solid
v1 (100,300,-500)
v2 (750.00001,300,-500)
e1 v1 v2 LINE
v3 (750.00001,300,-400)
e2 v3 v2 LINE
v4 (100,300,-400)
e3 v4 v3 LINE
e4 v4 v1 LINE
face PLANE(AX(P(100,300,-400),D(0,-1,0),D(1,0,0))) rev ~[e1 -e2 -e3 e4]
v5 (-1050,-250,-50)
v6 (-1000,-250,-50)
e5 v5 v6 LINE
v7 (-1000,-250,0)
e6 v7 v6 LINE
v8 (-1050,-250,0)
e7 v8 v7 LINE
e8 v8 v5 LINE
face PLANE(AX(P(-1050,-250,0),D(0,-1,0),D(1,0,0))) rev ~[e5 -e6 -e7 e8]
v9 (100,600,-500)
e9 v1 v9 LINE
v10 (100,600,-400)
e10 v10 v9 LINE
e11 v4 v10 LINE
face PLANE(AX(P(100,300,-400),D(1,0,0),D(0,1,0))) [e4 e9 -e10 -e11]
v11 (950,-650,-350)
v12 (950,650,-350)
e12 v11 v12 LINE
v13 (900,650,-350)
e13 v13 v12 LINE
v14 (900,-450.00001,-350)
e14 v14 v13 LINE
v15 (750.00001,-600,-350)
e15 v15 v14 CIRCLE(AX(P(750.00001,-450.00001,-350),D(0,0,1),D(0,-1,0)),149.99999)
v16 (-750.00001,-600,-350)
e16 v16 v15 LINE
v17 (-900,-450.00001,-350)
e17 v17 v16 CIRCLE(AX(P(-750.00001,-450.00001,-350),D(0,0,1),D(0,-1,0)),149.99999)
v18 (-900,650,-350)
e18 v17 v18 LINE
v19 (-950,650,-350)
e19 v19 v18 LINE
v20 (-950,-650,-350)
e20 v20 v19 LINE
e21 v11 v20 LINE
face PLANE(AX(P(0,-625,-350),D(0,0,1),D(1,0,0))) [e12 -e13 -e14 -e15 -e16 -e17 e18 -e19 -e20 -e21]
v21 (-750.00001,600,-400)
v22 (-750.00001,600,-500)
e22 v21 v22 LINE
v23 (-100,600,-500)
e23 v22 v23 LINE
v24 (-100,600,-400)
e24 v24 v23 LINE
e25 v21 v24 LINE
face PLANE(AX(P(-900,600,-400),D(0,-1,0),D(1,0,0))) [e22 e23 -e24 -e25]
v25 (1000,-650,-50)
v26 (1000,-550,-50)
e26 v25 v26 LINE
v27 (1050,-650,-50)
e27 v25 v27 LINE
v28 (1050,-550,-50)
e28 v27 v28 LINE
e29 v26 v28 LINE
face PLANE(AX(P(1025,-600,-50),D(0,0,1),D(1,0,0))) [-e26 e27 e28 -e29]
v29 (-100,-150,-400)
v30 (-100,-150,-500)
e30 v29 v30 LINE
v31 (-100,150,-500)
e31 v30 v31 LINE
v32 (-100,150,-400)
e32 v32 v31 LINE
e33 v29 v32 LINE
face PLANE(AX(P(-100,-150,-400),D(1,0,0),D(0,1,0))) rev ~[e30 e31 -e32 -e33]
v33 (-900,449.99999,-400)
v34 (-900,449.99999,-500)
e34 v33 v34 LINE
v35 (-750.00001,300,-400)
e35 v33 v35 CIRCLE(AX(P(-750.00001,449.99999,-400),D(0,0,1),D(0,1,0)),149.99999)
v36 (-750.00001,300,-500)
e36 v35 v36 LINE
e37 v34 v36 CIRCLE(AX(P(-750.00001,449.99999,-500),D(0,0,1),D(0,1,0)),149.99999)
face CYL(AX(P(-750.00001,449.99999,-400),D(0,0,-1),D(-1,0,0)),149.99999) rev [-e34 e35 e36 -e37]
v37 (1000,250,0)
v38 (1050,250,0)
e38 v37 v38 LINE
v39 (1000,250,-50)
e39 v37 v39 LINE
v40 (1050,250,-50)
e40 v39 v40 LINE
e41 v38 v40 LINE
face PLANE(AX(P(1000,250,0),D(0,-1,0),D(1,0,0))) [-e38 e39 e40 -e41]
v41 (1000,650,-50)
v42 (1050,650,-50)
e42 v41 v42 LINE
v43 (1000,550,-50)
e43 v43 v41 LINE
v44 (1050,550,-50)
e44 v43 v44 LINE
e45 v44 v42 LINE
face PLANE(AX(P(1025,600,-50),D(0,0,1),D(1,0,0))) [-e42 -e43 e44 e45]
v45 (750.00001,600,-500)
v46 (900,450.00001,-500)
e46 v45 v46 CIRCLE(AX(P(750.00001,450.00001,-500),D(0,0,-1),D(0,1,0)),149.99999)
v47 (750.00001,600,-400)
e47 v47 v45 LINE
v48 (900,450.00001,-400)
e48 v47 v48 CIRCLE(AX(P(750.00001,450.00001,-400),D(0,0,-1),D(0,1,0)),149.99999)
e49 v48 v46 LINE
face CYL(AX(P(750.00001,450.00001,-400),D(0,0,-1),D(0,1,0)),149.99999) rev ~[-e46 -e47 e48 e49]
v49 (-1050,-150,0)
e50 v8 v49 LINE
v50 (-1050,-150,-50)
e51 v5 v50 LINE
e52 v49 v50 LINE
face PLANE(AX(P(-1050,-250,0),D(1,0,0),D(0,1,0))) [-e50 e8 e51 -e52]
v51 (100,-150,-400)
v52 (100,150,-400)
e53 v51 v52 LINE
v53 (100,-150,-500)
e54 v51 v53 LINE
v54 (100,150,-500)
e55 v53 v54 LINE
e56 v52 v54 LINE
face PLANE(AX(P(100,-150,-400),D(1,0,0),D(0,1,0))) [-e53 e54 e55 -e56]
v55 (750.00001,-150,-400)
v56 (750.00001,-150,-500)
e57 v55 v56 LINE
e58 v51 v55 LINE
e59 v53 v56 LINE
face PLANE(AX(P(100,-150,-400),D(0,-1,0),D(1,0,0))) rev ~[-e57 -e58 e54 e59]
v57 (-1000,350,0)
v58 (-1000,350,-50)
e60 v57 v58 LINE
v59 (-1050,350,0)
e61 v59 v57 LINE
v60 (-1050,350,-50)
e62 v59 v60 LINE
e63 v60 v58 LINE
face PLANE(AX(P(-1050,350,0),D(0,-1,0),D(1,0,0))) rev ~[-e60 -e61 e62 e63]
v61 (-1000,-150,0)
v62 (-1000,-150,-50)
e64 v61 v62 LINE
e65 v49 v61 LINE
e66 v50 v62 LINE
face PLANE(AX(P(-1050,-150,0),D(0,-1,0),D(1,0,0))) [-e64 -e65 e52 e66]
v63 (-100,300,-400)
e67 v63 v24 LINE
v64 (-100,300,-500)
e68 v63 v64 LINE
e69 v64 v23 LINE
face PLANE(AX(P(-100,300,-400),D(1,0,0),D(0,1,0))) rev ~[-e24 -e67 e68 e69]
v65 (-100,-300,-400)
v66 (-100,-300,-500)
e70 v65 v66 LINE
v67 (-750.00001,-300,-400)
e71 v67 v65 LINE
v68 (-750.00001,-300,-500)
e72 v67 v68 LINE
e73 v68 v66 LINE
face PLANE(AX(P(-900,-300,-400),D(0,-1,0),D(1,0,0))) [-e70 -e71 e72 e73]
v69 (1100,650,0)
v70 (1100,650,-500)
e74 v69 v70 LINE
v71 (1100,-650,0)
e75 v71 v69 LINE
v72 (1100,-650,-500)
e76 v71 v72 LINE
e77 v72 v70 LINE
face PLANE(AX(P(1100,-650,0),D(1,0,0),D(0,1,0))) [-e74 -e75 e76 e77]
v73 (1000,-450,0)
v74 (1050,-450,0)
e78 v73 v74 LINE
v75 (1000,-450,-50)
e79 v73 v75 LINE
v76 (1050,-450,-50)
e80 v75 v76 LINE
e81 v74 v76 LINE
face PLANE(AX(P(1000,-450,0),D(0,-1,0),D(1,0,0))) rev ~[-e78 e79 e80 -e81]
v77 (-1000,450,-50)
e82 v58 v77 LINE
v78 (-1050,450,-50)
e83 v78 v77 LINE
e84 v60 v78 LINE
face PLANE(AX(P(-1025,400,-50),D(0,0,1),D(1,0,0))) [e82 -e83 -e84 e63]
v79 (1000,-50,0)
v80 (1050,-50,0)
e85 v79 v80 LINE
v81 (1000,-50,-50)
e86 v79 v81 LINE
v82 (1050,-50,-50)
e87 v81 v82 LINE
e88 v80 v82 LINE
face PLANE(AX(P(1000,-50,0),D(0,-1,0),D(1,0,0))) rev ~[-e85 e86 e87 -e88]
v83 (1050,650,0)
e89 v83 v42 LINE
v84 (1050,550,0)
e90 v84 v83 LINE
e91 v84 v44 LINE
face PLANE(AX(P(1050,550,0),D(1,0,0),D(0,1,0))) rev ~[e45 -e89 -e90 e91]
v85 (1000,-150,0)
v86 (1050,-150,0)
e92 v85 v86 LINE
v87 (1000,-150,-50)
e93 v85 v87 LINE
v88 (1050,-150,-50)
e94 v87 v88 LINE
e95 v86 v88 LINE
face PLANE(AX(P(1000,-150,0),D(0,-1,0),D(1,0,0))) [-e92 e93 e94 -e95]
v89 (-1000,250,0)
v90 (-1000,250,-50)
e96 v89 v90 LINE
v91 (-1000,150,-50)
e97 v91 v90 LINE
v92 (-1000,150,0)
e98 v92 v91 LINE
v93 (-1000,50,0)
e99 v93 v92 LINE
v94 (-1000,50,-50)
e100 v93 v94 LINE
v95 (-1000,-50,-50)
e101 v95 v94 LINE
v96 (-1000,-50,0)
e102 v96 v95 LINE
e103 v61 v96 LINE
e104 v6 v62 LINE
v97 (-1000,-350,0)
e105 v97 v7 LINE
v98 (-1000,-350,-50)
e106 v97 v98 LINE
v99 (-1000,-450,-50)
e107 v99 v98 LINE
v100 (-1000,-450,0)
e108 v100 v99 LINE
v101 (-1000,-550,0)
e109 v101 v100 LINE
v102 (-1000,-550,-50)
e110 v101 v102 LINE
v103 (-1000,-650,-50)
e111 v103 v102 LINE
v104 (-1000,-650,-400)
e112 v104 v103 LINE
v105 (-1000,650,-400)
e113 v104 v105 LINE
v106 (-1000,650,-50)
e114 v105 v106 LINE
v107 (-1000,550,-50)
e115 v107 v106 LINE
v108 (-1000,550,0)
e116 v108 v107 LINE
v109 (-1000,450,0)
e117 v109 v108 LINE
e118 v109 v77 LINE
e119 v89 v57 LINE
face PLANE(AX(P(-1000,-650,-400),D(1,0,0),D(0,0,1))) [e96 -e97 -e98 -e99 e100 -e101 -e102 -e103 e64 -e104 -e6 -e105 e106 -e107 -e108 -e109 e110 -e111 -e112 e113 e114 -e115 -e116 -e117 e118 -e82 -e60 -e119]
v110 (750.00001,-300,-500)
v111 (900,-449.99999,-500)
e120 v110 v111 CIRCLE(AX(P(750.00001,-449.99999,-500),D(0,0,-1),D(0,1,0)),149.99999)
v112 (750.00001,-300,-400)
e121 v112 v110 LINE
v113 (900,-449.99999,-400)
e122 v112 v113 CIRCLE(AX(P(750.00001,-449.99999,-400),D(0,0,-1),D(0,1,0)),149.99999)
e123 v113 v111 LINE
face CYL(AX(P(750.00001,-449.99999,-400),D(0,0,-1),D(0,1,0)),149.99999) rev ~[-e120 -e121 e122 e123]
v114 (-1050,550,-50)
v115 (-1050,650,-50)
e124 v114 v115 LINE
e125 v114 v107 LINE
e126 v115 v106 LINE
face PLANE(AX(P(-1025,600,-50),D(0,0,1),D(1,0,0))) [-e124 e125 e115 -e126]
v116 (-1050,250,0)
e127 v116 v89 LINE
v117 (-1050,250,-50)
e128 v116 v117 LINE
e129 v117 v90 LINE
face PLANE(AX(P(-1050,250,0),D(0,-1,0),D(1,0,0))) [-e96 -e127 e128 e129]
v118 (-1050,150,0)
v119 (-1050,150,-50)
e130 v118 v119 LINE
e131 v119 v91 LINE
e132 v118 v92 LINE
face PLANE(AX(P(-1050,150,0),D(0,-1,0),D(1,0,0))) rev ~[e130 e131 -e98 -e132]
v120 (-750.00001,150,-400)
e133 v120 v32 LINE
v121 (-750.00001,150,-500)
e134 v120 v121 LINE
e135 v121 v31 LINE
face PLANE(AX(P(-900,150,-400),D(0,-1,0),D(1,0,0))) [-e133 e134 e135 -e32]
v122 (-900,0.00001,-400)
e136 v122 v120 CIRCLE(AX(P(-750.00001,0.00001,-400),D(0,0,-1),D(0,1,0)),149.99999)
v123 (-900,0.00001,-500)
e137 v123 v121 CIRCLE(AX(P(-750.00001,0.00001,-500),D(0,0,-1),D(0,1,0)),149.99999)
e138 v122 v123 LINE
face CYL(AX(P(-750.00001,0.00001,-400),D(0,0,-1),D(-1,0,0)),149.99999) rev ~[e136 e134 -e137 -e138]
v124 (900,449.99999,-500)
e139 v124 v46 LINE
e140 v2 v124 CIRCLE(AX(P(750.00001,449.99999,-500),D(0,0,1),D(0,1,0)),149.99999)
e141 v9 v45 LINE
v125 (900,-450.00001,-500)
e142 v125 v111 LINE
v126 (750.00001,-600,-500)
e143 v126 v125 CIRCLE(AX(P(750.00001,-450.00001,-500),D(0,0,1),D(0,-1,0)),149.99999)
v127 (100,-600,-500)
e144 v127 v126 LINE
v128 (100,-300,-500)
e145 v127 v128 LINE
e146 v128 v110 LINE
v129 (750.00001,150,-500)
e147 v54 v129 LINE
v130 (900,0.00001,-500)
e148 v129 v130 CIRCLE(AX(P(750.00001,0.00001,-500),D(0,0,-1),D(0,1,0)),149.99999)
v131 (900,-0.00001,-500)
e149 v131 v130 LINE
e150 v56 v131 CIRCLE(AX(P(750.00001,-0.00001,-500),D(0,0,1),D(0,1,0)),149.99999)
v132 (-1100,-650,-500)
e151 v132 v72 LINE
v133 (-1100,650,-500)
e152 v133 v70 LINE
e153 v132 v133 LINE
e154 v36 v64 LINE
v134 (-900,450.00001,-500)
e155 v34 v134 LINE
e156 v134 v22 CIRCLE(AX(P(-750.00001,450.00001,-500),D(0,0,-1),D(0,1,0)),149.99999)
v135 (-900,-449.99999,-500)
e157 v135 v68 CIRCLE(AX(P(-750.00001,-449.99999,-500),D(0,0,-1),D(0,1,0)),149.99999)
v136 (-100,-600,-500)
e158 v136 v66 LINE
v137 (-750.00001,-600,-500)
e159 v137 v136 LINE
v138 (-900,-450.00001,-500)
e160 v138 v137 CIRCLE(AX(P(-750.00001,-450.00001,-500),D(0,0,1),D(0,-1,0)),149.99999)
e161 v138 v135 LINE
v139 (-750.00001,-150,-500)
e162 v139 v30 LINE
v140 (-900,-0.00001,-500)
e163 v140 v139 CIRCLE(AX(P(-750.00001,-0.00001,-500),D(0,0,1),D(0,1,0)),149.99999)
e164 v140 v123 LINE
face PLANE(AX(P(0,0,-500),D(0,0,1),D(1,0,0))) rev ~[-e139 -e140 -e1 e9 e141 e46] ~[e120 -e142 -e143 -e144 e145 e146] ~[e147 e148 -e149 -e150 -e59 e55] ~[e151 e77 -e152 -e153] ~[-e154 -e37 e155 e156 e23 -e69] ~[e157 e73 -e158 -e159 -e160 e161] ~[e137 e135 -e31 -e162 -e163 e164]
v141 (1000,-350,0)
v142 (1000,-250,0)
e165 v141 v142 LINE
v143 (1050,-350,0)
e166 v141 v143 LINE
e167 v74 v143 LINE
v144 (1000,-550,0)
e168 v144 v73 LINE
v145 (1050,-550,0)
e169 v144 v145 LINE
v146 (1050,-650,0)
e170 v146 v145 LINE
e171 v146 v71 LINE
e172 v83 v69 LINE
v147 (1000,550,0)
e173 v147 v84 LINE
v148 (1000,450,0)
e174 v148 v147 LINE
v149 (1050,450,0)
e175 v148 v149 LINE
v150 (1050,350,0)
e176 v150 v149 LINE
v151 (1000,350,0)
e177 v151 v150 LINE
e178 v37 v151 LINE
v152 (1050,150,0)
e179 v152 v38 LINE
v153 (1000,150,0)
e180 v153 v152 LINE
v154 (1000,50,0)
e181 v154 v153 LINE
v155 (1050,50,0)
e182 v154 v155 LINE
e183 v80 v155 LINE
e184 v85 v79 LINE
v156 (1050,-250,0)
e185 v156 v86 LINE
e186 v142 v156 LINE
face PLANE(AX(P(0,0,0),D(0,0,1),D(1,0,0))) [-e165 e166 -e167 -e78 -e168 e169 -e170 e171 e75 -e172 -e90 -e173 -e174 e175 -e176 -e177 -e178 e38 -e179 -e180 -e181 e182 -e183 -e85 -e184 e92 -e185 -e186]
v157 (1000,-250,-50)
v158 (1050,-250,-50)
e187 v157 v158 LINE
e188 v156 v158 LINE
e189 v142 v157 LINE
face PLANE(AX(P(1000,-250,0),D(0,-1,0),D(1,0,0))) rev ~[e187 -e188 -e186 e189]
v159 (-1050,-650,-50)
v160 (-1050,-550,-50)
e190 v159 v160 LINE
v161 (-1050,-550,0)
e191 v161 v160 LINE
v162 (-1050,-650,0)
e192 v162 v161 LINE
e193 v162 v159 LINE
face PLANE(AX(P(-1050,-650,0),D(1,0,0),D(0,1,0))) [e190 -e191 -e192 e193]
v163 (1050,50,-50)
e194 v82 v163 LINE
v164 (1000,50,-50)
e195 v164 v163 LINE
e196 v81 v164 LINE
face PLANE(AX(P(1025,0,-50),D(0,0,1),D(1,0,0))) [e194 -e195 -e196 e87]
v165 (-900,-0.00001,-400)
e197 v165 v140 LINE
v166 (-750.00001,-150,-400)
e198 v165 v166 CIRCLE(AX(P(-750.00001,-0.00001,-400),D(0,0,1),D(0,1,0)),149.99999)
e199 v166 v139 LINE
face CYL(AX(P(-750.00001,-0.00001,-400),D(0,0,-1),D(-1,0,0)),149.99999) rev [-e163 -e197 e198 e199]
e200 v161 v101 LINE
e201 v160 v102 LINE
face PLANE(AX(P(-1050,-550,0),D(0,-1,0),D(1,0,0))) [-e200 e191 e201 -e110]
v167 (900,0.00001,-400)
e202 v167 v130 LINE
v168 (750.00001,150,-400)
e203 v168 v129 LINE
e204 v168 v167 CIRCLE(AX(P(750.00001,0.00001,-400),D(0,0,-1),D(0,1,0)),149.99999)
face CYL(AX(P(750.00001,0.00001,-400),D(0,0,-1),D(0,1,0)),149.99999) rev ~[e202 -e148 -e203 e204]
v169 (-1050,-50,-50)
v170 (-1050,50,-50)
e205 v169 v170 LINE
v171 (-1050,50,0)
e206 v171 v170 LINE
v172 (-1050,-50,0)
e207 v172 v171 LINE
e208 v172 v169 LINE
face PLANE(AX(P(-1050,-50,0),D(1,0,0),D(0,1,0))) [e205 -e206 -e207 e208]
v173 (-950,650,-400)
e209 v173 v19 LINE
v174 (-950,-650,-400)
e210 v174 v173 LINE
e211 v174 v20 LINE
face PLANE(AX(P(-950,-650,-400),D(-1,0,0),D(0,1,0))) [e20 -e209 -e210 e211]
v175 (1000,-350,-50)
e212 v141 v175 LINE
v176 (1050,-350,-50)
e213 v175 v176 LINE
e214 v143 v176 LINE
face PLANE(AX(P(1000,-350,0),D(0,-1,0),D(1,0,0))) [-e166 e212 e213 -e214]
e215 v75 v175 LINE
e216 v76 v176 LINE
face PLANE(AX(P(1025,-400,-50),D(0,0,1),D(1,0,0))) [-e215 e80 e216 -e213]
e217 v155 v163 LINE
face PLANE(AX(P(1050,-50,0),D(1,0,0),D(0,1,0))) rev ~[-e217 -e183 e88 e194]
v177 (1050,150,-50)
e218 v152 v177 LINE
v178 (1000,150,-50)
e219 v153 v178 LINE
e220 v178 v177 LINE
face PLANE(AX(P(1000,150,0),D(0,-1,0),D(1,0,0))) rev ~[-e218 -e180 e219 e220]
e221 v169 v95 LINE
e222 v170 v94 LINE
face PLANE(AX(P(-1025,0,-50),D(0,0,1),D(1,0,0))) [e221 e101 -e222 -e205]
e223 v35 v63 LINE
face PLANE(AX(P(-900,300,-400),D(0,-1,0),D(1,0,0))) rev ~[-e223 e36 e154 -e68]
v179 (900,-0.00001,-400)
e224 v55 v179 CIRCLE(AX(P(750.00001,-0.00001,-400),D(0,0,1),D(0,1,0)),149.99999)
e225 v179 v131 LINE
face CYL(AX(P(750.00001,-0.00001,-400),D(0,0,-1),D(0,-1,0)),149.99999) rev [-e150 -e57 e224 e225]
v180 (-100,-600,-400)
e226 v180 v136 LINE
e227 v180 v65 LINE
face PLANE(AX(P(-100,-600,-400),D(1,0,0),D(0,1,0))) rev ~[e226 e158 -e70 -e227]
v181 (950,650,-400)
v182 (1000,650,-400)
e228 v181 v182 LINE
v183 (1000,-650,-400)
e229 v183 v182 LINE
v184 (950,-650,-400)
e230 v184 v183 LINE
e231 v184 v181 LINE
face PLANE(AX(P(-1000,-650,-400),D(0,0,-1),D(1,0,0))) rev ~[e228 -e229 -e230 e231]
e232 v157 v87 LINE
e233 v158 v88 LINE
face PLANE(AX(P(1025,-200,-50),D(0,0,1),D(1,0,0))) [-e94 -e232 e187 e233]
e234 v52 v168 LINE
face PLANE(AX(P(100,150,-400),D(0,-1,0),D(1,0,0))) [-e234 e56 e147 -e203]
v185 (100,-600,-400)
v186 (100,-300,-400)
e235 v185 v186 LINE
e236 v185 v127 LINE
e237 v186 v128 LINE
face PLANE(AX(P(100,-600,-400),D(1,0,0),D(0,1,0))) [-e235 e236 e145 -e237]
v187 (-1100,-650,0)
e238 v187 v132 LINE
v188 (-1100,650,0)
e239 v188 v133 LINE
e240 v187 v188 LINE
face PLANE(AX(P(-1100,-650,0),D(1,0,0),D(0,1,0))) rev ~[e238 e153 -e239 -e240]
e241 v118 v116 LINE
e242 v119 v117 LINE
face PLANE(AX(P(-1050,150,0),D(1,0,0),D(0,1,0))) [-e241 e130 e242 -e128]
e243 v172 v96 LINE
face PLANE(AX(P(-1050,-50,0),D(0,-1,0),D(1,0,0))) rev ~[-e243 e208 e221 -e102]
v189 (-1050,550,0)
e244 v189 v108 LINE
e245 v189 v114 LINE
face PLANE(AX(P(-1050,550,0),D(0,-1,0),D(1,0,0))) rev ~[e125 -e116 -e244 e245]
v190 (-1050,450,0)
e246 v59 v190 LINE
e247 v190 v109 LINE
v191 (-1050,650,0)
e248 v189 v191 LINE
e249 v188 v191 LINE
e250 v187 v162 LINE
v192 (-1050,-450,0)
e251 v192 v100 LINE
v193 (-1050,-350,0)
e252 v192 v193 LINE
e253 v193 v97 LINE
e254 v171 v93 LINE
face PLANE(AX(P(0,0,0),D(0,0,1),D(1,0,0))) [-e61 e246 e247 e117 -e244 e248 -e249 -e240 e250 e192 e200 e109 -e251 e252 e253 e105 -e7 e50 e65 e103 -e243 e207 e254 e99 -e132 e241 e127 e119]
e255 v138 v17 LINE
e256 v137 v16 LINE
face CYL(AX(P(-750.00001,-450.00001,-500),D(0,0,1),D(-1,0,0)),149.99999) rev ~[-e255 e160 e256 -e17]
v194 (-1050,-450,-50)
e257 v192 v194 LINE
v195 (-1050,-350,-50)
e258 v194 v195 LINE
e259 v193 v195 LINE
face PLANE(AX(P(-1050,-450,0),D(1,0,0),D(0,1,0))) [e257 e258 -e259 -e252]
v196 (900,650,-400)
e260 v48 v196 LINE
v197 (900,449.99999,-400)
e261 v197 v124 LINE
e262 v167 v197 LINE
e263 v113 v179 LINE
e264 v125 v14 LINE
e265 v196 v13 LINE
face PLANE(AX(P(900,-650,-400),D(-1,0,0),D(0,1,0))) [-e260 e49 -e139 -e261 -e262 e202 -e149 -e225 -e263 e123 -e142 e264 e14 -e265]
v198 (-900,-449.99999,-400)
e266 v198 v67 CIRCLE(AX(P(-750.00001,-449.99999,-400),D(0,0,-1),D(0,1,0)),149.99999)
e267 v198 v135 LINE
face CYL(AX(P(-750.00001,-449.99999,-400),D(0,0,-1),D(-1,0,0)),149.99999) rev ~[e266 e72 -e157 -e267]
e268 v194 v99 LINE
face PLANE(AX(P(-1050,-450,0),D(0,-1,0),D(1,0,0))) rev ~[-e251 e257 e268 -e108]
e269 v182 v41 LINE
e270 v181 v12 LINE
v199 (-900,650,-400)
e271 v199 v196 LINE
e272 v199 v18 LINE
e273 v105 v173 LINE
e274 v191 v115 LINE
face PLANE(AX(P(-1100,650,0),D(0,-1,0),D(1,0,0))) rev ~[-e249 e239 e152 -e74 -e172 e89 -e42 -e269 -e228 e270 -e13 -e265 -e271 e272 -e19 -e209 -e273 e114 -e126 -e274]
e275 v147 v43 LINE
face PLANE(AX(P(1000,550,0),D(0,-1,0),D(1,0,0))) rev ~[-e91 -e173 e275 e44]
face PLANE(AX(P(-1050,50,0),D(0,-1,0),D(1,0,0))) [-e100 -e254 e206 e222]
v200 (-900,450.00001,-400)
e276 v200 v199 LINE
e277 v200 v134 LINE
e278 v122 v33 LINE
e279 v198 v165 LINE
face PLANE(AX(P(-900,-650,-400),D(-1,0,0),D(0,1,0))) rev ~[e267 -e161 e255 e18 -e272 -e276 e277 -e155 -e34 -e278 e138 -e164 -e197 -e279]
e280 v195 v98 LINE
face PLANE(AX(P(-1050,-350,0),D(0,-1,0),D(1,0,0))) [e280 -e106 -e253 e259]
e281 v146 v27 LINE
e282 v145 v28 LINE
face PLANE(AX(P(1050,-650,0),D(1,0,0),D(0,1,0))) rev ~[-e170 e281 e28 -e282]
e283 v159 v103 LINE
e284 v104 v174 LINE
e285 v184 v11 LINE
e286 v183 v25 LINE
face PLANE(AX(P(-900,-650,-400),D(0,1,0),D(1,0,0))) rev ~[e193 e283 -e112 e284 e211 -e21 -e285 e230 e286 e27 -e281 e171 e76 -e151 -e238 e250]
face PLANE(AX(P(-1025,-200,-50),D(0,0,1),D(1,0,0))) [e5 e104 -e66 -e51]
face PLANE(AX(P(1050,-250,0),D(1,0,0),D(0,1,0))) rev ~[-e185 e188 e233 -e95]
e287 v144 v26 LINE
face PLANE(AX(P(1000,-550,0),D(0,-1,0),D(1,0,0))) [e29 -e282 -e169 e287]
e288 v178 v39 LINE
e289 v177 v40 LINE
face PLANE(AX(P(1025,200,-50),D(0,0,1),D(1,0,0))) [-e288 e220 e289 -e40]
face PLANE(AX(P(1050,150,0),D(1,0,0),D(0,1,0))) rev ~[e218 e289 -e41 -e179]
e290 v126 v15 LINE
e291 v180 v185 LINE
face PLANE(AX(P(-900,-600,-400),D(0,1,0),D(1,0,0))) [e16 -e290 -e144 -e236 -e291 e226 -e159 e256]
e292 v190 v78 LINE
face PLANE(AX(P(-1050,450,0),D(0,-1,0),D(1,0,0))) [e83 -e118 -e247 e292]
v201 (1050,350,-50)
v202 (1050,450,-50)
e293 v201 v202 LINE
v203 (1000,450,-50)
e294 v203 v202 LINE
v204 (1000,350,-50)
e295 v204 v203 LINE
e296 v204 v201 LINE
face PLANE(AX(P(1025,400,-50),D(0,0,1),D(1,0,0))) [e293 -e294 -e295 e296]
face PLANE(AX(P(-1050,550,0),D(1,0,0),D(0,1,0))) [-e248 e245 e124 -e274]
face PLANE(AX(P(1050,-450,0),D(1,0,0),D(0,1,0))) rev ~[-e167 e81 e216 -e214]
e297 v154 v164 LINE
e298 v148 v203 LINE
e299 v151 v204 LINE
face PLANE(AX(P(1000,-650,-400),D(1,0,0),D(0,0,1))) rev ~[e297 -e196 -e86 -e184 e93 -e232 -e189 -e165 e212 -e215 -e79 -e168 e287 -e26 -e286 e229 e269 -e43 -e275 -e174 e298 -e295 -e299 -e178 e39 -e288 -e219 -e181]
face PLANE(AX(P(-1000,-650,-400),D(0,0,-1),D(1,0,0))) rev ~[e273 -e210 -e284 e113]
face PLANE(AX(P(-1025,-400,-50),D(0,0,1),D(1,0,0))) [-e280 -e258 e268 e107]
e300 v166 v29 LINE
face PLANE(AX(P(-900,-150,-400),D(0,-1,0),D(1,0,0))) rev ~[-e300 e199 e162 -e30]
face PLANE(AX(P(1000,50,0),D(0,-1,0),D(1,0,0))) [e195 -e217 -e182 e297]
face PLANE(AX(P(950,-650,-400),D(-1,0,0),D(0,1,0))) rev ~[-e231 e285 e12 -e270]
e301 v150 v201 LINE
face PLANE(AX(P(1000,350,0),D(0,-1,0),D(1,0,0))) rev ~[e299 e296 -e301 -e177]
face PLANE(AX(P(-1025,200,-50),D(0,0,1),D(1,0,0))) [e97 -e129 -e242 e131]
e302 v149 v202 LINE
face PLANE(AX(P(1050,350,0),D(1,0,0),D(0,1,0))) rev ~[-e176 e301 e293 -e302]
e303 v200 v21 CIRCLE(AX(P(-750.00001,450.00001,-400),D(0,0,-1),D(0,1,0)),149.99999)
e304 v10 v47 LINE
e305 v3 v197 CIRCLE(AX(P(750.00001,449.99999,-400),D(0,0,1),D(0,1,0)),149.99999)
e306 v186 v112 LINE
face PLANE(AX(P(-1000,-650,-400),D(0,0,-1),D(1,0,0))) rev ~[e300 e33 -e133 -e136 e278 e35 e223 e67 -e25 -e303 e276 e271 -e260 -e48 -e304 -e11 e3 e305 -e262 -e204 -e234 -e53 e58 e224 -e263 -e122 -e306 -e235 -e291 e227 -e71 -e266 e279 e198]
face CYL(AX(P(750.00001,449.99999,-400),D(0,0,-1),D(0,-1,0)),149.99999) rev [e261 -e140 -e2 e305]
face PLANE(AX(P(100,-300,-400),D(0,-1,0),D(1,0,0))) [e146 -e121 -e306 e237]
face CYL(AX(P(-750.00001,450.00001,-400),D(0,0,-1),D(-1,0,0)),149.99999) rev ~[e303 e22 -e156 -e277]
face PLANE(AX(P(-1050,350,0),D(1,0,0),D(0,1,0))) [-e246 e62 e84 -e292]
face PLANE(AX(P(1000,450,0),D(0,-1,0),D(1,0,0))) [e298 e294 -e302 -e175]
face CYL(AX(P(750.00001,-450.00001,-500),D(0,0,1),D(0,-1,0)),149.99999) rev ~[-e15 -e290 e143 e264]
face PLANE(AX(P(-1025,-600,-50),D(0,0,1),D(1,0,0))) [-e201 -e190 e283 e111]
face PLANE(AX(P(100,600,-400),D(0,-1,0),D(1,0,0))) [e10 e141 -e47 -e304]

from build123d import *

# Parameters (mm, degrees)
F0_W      = 2200
F0_H      = 1300
F1_DEPTH  = 500
F2_W      = 2000
F2_H      = 400
F3_DEPTH  = 1300
F4_W      = 50
F4_H      = 100
F5_DEPTH  = 50
F6_W      = 50
F6_H      = 100
F7_DEPTH  = 50
F8_W      = 50
F8_H      = 1300
F9_DEPTH  = 50
F10_W     = 1800
F10_H     = 50
F11_DEPTH = 50
F12_W     = 800
F12_H     = 300
F13_DEPTH = 180
F14_R     = 149.99999


# Not quite as in the source:
# - a fillet or chamfer is up to 0.001 mm smaller than in the source, because OpenCascade refuses the exact size


with BuildPart() as f1:
    # F0 (on Top) → F1 (new body)
    with BuildSketch(Plane.XY):
        Rectangle(F0_W, F0_H)
    extrude(amount=-F1_DEPTH)

    # F2 (on face) → F3 (cut)
    with BuildSketch(Plane.XZ.offset(650)):
        with Locations((0, -200)):
            Rectangle(F2_W, F2_H)
    extrude(amount=-F3_DEPTH, mode=Mode.SUBTRACT)

    # F4 (on face) → F5 (cut)
    with BuildSketch(Plane.XY):
        with Locations((-1025, -600)):
            Rectangle(F4_W, F4_H)
        with Locations((-1025, -400)):
            Rectangle(F4_W, F4_H)
        with Locations((-1025, -200)):
            Rectangle(F4_W, F4_H)
        with Locations((-1025, 0)):
            Rectangle(F4_W, F4_H)
        with Locations((-1025, 200)):
            Rectangle(F4_W, F4_H)
        with Locations((-1025, 400)):
            Rectangle(F4_W, F4_H)
        with Locations((-1025, 600)):
            Rectangle(F4_W, F4_H)
    extrude(amount=-F5_DEPTH, mode=Mode.SUBTRACT)

    # F6 (on face) → F7 (cut)
    with BuildSketch(Plane.XY):
        with Locations((1025, 600)):
            Rectangle(F6_W, F6_H)
        with Locations((1025, 400)):
            Rectangle(F6_W, F6_H)
        with Locations((1025, 200)):
            Rectangle(F6_W, F6_H)
        with Locations((1025, 0)):
            Rectangle(F6_W, F6_H)
        with Locations((1025, -200)):
            Rectangle(F6_W, F6_H)
        with Locations((1025, -400)):
            Rectangle(F6_W, F6_H)
        with Locations((1025, -600)):
            Rectangle(F6_W, F6_H)
    extrude(amount=-F7_DEPTH, mode=Mode.SUBTRACT)

    # F8 (on face) → F9 (join)
    with BuildSketch(Plane.XY.offset(-400)):
        with Locations((-925, 0)):
            Rectangle(F8_W, F8_H)
        with Locations((925, 0)):
            Rectangle(F8_W, F8_H)
    extrude(amount=F9_DEPTH)

    # F10 (on face) → F11 (join)
    with BuildSketch(Plane.XY.offset(-400)):
        with Locations((0, -625)):
            Rectangle(F10_W, F10_H)
    extrude(amount=F11_DEPTH)

    # F12 (on face) → F13 (cut)
    with BuildSketch(Plane.XY.offset(-400)):
        with Locations((-500, 450)):
            Rectangle(F12_W, F12_H)
        with Locations((500, 450)):
            Rectangle(F12_W, F12_H)
        with Locations((500, 0)):
            Rectangle(F12_W, F12_H)
        with Locations((-500, 0)):
            Rectangle(F12_W, F12_H)
        with Locations((-500, -450)):
            Rectangle(F12_W, F12_H)
        with Locations((500, -450)):
            Rectangle(F12_W, F12_H)
    extrude(amount=-F13_DEPTH, mode=Mode.SUBTRACT)

    # F14 (radius 150 in the source; OpenCascade refuses exactly that, so slightly less here)
    f14_edges = [f1.edges().sort_by_distance(p)[0] for p in [
        (-900, 600, -450),
        (-900, 300, -450),
        (-900, -150, -450),
        (-900, 150, -450),
        (-900, -600, -425),
        (-900, -300, -450),
        (900, 600, -450),
        (900, 150, -450),
        (900, -300, -450),
        (900, 300, -450),
        (900, -150, -450),
        (900, -600, -425),
    ]]
    fillet(f14_edges, radius=F14_R)


solid = f1.part
